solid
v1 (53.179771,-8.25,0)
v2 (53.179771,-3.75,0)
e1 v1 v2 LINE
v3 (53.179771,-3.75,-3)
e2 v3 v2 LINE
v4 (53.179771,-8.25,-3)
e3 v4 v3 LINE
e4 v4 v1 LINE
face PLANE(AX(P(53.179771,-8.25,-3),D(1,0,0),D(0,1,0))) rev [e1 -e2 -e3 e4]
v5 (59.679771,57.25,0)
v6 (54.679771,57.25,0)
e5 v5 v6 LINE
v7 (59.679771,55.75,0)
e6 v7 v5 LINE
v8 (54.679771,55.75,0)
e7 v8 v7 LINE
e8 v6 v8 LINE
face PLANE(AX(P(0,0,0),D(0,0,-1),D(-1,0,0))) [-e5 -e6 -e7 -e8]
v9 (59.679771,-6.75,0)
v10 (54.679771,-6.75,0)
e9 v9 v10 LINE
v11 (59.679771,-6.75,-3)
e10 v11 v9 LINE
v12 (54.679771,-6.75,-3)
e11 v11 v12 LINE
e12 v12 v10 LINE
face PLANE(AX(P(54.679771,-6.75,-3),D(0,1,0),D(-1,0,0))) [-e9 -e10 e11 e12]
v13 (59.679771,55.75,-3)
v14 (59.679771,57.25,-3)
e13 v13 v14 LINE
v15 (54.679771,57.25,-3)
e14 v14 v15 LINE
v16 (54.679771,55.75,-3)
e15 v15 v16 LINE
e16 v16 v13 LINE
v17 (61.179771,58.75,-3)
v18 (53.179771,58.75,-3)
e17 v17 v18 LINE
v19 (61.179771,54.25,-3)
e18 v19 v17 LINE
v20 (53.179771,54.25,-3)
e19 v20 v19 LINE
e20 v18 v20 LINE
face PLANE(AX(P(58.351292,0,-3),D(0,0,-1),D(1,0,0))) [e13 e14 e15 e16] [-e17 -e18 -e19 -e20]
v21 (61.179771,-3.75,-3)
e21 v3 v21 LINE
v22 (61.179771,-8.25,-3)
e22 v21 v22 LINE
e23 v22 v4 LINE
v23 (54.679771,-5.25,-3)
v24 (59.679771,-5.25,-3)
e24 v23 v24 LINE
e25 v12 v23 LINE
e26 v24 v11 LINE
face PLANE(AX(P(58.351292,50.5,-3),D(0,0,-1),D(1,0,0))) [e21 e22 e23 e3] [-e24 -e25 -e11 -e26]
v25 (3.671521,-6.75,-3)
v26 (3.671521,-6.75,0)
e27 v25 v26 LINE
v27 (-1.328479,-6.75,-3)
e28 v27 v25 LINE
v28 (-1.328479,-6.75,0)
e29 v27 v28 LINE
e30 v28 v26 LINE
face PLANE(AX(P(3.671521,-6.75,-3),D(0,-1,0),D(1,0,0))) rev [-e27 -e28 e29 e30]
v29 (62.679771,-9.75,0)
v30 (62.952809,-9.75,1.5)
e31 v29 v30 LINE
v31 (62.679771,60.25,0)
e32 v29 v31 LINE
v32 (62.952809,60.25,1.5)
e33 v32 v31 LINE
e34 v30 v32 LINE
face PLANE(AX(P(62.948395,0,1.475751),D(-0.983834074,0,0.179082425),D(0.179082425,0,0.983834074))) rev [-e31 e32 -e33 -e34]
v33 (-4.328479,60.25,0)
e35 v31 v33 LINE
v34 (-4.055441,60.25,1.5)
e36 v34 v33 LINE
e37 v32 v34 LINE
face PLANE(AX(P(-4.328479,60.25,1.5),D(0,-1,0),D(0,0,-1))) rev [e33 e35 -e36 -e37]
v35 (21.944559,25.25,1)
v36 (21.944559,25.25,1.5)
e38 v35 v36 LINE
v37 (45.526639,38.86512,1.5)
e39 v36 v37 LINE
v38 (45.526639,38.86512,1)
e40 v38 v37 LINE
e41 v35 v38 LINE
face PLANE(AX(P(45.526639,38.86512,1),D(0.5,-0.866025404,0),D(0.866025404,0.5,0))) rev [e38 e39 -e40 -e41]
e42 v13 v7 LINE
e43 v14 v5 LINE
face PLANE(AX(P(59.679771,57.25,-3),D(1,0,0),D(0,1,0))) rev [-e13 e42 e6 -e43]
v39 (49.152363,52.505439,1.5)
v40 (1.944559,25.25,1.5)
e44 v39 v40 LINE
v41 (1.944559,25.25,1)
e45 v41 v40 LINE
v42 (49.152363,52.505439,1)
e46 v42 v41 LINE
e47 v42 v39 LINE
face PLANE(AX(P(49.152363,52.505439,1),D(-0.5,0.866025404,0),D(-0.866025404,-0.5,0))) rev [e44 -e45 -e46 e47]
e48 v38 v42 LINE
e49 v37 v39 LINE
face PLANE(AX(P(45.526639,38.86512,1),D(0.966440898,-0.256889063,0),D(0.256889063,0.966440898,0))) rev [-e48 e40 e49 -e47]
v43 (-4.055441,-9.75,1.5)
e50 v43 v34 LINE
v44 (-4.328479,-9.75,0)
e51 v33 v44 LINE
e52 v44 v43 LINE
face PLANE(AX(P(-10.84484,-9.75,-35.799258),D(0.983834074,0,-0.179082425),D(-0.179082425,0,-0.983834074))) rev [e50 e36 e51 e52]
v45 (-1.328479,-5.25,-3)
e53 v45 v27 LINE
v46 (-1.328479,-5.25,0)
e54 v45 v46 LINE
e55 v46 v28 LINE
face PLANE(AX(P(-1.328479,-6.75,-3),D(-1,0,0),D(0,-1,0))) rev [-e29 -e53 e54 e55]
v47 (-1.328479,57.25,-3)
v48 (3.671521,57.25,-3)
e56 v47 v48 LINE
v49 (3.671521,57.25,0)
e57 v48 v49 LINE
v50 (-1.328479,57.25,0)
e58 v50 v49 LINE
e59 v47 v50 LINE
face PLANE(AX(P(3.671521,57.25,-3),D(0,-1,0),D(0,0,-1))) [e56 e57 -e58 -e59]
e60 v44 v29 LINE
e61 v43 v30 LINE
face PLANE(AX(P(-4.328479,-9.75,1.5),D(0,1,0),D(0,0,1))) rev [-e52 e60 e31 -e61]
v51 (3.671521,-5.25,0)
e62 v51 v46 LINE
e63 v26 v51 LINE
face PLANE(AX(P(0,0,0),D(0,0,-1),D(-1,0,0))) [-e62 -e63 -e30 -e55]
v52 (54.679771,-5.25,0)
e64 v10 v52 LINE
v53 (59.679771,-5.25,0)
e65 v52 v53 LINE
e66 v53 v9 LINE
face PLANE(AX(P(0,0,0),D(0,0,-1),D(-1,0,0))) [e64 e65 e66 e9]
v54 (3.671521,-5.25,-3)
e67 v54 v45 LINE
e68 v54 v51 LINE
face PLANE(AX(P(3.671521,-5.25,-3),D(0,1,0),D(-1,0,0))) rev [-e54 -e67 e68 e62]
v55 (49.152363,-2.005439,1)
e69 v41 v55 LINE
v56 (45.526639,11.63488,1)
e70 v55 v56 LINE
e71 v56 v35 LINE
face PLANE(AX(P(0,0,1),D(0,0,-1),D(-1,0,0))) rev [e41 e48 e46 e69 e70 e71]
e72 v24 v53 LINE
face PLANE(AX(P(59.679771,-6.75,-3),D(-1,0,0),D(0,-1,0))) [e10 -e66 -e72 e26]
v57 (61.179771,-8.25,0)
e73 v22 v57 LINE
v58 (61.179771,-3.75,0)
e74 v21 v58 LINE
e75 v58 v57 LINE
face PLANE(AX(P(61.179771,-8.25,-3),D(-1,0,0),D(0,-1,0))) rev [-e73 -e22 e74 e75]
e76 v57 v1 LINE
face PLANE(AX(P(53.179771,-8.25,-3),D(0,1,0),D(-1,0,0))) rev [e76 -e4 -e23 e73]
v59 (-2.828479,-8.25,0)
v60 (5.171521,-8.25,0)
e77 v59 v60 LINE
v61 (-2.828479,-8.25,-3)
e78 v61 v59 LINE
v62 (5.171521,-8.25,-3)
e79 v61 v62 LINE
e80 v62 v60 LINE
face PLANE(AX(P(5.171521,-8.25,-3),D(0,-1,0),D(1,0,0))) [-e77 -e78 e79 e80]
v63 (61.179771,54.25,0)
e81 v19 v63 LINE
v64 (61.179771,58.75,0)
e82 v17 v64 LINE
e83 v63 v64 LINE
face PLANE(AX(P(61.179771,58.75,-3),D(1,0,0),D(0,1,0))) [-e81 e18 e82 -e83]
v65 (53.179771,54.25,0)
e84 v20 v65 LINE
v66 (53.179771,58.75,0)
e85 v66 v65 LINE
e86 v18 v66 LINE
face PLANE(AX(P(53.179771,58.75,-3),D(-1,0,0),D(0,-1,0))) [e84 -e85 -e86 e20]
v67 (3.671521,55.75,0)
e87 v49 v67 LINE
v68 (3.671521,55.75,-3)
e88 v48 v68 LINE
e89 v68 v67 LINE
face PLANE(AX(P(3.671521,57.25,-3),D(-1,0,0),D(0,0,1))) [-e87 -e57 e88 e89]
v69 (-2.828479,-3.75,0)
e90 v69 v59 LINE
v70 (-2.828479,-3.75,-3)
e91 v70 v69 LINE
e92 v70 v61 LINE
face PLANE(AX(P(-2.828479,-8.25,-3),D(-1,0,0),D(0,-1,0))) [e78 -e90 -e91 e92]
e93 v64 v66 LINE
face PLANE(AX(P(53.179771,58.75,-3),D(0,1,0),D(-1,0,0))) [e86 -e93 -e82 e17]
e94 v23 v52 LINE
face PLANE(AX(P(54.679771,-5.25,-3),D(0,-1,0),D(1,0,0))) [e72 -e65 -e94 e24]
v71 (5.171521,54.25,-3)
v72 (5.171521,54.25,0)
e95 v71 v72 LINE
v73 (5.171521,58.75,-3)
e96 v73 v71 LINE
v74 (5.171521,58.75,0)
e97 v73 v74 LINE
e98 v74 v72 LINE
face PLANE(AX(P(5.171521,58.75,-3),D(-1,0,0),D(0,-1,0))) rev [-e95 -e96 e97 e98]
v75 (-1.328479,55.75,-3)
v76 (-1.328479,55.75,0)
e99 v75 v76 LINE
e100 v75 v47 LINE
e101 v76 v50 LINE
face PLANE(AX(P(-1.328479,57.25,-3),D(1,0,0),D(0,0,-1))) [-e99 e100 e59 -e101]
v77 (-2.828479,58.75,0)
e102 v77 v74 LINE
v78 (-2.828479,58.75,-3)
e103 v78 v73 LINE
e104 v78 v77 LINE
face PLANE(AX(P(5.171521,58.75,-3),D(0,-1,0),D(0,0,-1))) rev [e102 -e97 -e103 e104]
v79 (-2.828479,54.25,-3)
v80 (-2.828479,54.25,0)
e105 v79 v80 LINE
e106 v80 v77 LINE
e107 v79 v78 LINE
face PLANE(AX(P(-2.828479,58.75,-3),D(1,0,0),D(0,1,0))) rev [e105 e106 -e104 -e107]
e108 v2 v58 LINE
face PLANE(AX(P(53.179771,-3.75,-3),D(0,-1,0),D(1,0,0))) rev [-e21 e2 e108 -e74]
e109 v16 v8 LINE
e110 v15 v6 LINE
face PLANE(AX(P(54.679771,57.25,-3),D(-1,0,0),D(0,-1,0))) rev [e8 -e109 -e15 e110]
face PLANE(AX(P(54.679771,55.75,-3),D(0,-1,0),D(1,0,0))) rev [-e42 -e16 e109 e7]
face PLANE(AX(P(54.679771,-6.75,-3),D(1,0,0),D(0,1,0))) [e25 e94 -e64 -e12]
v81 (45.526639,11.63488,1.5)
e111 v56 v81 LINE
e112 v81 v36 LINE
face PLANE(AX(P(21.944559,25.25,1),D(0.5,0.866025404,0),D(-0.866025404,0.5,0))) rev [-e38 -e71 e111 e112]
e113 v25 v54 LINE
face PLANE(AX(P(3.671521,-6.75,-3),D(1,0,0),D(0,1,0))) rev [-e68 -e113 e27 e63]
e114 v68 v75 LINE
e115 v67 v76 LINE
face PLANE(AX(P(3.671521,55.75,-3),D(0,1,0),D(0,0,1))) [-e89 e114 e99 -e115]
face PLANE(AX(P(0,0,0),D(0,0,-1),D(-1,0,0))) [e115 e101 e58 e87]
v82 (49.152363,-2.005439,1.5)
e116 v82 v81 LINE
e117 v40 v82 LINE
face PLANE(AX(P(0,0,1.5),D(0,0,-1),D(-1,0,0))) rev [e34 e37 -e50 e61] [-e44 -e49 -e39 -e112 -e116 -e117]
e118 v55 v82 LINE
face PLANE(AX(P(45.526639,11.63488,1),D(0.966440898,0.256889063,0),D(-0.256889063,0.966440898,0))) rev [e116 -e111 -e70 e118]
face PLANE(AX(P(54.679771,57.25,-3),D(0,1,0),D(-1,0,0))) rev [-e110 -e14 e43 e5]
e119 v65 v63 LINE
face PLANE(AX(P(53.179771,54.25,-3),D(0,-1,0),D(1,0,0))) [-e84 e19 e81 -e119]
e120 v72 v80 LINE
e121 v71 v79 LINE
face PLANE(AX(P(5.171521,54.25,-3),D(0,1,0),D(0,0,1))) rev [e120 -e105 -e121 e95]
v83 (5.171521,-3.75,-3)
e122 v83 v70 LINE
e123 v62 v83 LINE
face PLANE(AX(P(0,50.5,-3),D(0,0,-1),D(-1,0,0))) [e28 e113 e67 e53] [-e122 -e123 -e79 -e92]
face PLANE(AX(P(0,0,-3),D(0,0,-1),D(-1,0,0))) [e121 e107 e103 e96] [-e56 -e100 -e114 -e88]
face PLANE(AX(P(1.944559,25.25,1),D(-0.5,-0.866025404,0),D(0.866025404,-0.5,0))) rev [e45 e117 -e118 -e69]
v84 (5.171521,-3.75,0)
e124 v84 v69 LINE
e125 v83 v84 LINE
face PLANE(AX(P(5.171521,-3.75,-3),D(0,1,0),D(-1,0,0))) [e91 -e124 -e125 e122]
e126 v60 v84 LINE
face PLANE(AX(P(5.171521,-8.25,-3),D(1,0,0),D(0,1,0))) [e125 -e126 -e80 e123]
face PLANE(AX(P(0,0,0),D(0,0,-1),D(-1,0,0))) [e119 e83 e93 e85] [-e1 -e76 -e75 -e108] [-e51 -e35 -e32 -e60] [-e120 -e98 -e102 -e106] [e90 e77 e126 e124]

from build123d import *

# Parameters (mm, degrees)
SKETCH1_W                 = 67.008250425
SKETCH1_H                 = 70
BOSS_EXTRUDE1_DEPTH       = 1.5
BOSS_EXTRUDE2_START       = -9.75
BOSS_EXTRUDE2_DEPTH       = 70
CUT_EXTRUDE1_START        = -6
CUT_EXTRUDE1_OUTLINE_W    = 73
CUT_EXTRUDE1_OUTLINE_H    = 4
CUT_EXTRUDE1_DEPTH        = 1.741494861
SKETCH4_W                 = 8
SKETCH4_H                 = 4.5
SKETCH4_W_2               = 5
SKETCH4_H_2               = 1.5
BOSS_EXTRUDE3_DEPTH       = 3
MIRROR2_COPY_1_SKETCH_W   = 8
MIRROR2_COPY_1_SKETCH_H   = 4.5
MIRROR2_COPY_1_SKETCH_W_2 = 5
MIRROR2_COPY_1_SKETCH_H_2 = 1.5
MIRROR2_COPY_1_DEPTH      = 3
CUT_EXTRUDE2_DEPTH        = 0.5


with BuildPart() as part:
    # Sketch1 → Boss-Extrude1 (new body)
    with BuildSketch(Plane.XY):
        with Locations((29.175646202, 25.25)):
            Rectangle(SKETCH1_W, SKETCH1_H)
    extrude(amount=BOSS_EXTRUDE1_DEPTH)

    # Boss-Extrude2: read off the stored shape, not the designer's step
    # Boss-Extrude2 outline → Boss-Extrude2 (add)
    with BuildSketch(Plane(origin=(0, 0, 0), x_dir=(1, 0, 0), z_dir=(0, 1, 0)).offset(BOSS_EXTRUDE2_START)):
        Polygon((62.952808957, -1.5), (62.679771414, 0), (62.679771414, -1.5), align=None)
    extrude(amount=BOSS_EXTRUDE2_DEPTH)

    # Cut-Extrude1: read off the stored shape, not the designer's step
    # Cut-Extrude1 outline → Cut-Extrude1 (cut)
    with BuildSketch(Plane(origin=(0, 0, 0), x_dir=(0, 1, 0), z_dir=(0.9838340738940914, 0, -0.17908242528220206)).offset(CUT_EXTRUDE1_START)):
        with Locations((25.5, 0)):
            Rectangle(CUT_EXTRUDE1_OUTLINE_W, CUT_EXTRUDE1_OUTLINE_H)
    extrude(amount=CUT_EXTRUDE1_DEPTH, mode=Mode.SUBTRACT)

    # Sketch4 → Boss-Extrude3 (add)
    with BuildSketch(Plane(origin=(0, 0, 0), x_dir=(-1, 0, 0), z_dir=(0, 0, -1))):
        with Locations((-1.171520989, 56.5)):
            Rectangle(SKETCH4_W, SKETCH4_H)
        with Locations((-1.171520989, 56.5)):
            Rectangle(SKETCH4_W_2, SKETCH4_H_2, mode=Mode.SUBTRACT)
    boss_extrude3 = extrude(amount=BOSS_EXTRUDE3_DEPTH)

    # Mirror1: Boss-Extrude3 across plane
    add(boss_extrude3.mirror(Plane(origin=(29.175646202, 0, 0), x_dir=(0, 0, 1), z_dir=(1, 0, 0))))

    # Mirror2: Boss-Extrude3 across plane
    add(boss_extrude3.mirror(Plane(origin=(0, 25.25, 0), x_dir=(0, 0, 1), z_dir=(0, -1, 0))))

    # Mirror2 copy 1 sketch → Mirror2 copy 1 (add)
    with BuildSketch(Plane(origin=(58.351292403, 50.5, 0), x_dir=(1, 0, 0), z_dir=(0, 0, -1))):
        with Locations((-1.171520989, 56.5)):
            Rectangle(MIRROR2_COPY_1_SKETCH_W, MIRROR2_COPY_1_SKETCH_H)
        with Locations((-1.171520989, 56.5)):
            Rectangle(MIRROR2_COPY_1_SKETCH_W_2, MIRROR2_COPY_1_SKETCH_H_2, mode=Mode.SUBTRACT)
    extrude(amount=MIRROR2_COPY_1_DEPTH)

    # Sketch6 → Cut-Extrude2 (cut)
    with BuildSketch(Plane.XY.offset(1.5)):
        Polygon((45.526638666, 38.865120313), (49.152363366, 52.505438829), (1.944558532, 25.25), (49.152363366, -2.005438829), (45.526638666, 11.634879687), (21.944558532, 25.25), align=None)
    extrude(amount=-CUT_EXTRUDE2_DEPTH, mode=Mode.SUBTRACT)


solid = part.part
